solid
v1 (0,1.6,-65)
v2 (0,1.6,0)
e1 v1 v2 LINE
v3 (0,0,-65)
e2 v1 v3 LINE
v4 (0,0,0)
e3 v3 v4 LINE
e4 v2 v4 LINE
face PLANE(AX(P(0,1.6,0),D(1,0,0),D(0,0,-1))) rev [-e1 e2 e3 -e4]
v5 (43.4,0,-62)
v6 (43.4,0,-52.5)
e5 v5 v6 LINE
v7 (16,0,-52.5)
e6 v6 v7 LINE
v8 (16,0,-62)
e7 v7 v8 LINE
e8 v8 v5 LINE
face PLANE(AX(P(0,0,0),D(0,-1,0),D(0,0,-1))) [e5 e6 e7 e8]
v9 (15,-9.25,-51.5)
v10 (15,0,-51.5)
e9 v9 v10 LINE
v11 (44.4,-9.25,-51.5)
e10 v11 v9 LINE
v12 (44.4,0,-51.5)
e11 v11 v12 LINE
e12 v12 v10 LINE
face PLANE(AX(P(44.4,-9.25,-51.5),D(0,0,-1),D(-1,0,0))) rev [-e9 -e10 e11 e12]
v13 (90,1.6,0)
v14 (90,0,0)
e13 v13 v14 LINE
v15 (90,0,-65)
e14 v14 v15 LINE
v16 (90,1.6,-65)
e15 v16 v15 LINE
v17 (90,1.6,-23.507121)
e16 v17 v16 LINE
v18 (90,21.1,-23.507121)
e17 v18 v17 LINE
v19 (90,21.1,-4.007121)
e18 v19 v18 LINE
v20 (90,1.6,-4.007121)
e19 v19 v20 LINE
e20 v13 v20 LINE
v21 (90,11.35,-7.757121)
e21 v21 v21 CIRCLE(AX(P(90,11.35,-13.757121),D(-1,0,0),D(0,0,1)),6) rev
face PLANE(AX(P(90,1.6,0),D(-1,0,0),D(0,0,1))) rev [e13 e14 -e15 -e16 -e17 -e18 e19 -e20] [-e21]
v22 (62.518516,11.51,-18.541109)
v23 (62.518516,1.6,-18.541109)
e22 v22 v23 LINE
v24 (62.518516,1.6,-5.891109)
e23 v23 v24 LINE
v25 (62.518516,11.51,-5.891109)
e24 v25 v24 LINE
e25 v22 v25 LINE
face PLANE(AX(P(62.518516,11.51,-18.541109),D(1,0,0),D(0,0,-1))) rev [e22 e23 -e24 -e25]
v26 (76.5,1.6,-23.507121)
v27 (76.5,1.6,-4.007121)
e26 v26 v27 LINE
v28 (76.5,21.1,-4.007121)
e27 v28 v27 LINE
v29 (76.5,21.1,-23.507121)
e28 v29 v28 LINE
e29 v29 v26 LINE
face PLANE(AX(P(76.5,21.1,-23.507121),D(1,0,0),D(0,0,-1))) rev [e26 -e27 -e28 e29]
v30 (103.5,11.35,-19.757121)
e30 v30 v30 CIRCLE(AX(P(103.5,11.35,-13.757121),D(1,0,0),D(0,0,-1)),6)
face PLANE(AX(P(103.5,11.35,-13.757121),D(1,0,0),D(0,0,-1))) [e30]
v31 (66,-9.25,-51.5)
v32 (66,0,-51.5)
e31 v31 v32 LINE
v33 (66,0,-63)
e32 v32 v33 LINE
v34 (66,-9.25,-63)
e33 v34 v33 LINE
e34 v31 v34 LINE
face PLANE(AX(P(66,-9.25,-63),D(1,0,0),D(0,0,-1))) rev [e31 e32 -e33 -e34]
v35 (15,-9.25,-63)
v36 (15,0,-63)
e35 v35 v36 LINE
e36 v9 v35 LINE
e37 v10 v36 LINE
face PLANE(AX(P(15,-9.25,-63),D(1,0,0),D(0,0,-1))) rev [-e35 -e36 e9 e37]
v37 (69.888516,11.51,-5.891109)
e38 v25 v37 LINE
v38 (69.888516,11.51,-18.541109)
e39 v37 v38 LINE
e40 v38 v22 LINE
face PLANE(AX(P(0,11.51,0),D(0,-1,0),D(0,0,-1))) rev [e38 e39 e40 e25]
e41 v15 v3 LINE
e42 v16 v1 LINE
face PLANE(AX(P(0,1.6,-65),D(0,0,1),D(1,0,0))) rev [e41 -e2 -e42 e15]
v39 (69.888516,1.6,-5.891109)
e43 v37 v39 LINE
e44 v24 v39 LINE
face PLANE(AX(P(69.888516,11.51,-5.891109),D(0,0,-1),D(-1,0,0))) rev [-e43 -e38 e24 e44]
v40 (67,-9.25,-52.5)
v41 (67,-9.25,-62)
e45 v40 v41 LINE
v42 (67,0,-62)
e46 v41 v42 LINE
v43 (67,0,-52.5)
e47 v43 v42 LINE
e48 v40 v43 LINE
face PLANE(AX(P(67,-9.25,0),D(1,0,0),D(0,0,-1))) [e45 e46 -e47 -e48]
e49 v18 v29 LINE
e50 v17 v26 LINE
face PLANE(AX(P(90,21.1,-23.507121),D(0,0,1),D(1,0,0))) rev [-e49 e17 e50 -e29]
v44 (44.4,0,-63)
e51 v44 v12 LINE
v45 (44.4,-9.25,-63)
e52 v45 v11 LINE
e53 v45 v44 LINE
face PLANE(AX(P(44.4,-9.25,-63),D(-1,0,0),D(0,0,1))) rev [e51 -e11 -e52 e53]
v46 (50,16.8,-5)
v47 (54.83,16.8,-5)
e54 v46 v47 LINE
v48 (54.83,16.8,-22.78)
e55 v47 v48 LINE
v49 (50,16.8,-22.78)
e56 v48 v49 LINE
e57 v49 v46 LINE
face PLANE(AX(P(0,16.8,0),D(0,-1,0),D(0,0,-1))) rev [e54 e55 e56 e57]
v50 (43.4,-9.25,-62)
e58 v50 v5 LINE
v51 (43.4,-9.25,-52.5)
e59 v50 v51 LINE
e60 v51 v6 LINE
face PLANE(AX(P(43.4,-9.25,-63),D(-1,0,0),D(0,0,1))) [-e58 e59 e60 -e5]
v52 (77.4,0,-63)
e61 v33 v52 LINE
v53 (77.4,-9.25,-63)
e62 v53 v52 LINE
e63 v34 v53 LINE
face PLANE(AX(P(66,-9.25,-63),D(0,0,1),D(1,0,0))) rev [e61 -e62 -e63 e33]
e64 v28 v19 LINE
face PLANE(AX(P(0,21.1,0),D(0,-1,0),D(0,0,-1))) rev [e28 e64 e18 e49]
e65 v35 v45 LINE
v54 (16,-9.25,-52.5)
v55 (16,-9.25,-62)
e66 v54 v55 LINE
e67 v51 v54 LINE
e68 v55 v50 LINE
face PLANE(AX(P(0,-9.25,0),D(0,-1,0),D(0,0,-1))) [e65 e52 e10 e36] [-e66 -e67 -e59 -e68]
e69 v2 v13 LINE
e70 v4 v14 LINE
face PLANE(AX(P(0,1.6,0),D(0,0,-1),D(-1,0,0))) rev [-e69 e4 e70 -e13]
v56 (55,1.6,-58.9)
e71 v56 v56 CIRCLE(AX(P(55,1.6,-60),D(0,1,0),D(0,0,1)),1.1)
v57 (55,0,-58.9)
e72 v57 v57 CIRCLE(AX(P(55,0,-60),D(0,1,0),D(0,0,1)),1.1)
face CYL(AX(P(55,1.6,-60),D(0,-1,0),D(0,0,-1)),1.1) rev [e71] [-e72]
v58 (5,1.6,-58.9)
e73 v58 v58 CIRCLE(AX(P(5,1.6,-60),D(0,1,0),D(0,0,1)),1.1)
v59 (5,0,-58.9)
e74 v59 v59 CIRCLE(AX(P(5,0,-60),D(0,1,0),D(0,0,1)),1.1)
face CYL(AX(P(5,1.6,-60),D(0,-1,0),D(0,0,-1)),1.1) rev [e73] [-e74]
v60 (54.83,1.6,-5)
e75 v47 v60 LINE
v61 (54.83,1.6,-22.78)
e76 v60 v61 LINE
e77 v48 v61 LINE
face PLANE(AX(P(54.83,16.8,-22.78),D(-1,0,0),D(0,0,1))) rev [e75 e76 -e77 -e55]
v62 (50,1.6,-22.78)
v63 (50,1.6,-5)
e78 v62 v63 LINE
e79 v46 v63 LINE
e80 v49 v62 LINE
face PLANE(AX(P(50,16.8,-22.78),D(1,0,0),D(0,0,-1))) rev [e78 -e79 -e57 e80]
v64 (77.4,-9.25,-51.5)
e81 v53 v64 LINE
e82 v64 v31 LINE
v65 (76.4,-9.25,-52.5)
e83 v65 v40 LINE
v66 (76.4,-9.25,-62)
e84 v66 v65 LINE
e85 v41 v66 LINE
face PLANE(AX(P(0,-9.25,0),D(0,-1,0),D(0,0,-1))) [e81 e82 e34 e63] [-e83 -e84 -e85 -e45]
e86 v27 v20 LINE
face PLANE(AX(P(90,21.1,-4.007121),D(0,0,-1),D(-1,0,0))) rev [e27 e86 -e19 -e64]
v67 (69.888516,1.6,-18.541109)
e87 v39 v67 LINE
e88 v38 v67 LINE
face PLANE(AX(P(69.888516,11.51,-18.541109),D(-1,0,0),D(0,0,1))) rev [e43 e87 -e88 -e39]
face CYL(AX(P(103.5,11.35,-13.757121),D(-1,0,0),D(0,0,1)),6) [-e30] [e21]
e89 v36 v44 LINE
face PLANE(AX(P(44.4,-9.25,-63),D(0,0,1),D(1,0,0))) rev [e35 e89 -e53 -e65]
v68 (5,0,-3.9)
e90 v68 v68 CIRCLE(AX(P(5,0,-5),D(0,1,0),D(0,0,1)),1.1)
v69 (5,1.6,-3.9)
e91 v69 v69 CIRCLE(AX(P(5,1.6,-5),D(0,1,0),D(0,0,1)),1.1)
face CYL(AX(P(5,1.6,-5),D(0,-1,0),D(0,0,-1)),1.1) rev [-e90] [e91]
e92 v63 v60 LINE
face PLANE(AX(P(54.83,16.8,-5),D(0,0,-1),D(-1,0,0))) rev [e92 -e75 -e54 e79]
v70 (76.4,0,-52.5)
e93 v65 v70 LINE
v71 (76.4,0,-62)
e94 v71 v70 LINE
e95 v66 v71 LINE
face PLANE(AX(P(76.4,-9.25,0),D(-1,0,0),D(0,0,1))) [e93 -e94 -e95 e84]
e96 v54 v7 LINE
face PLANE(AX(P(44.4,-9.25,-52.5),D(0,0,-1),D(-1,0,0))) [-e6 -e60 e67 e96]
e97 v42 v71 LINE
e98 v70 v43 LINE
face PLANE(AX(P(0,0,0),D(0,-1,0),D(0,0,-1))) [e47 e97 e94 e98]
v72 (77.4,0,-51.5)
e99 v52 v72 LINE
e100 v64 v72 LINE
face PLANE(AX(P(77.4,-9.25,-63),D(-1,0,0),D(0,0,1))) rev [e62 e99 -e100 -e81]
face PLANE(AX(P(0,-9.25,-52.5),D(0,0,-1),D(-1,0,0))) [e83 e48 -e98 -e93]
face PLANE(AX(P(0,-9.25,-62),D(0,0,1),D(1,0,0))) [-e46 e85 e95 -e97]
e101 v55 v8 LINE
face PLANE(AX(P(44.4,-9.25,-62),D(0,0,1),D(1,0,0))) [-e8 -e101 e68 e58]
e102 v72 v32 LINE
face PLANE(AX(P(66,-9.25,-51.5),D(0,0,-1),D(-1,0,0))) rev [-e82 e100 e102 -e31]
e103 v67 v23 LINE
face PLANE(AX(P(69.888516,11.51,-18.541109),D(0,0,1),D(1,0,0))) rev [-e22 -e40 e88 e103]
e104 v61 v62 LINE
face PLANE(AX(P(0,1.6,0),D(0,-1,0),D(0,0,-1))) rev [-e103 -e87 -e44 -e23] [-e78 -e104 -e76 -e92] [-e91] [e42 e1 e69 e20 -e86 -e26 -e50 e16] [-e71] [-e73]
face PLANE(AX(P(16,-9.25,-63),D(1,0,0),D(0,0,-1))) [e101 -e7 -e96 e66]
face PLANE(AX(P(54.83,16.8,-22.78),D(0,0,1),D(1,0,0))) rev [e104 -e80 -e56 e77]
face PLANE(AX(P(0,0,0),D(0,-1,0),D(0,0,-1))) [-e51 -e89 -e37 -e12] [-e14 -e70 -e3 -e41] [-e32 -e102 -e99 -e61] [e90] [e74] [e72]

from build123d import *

# Parameters (mm, degrees)
SKETCH1_W                            = 90
SKETCH1_H                            = 65
SKETCH1_R                            = 1.1
BOSS_EXTRUDE1_DEPTH                  = 1.6
SKETCH2_W                            = 29.4
SKETCH2_H                            = 11.5
SKETCH2_W_2                          = 27.4
SKETCH2_H_2                          = 9.5
SKETCH2_W_3                          = 11.4
SKETCH2_W_4                          = 9.4
CELL_AND_THERMISTOR_CONNECTORS_DEPTH = 9.25
SKETCH3_W                            = 13.5
SKETCH3_H                            = 19.5
BOSS_EXTRUDE2_DEPTH                  = 19.5
SKETCH4_R                            = 6
BOSS_EXTRUDE3_DEPTH                  = 13.5
SKETCH5_W                            = 4.83
SKETCH5_H                            = 17.78
JTAG_HEADER_DEPTH                    = 15.2
SKETCH6_W                            = 7.37
SKETCH6_H                            = 12.65
AUX_CAN_HEADER_DEPTH                 = 9.91


with BuildPart() as part:
    # Sketch1 → Boss-Extrude1 (new body)
    with BuildSketch(Plane(origin=(0, 0, 0), x_dir=(1, 0, 0), z_dir=(0, 1, 0))):
        with Locations((45, 32.5)):
            Rectangle(SKETCH1_W, SKETCH1_H)
        with Locations((5, 5)):
            Circle(SKETCH1_R, mode=Mode.SUBTRACT)
        with Locations((5, 60)):
            Circle(SKETCH1_R, mode=Mode.SUBTRACT)
        with Locations((55, 60)):
            Circle(SKETCH1_R, mode=Mode.SUBTRACT)
    extrude(amount=BOSS_EXTRUDE1_DEPTH)

    # Sketch2 → Cell and thermistor connectors (add)
    # profile 1 of 2: a face of its own
    with BuildSketch(Plane.XZ):
        with Locations((29.7, -57.25)):
            Rectangle(SKETCH2_W, SKETCH2_H)
        with Locations((29.7, -57.25)):
            Rectangle(SKETCH2_W_2, SKETCH2_H_2, mode=Mode.SUBTRACT)
    # profile 2 of 2: a face of its own
    with BuildSketch(Plane.XZ):
        with Locations((71.7, -57.25)):
            Rectangle(SKETCH2_W_3, SKETCH2_H)
        with Locations((71.7, -57.25)):
            Rectangle(SKETCH2_W_4, SKETCH2_H_2, mode=Mode.SUBTRACT)
    extrude(amount=CELL_AND_THERMISTOR_CONNECTORS_DEPTH)

    # Sketch3 → Boss-Extrude2 (add)
    with BuildSketch(Plane(origin=(0, 1.6, 0), x_dir=(1, 0, 0), z_dir=(0, 1, 0))):
        with Locations((83.25, 13.757121209)):
            Rectangle(SKETCH3_W, SKETCH3_H)
    extrude(amount=BOSS_EXTRUDE2_DEPTH)

    # Sketch4 → Boss-Extrude3 (add)
    with BuildSketch(Plane(origin=(90, 0, 0), x_dir=(0, 0, -1), z_dir=(1, 0, 0))):
        with Locations((13.757121209, 11.35)):
            Circle(SKETCH4_R)
    extrude(amount=BOSS_EXTRUDE3_DEPTH)

    # Sketch5 → JTAG header (add)
    with BuildSketch(Plane(origin=(0, 1.6, 0), x_dir=(1, 0, 0), z_dir=(0, 1, 0))):
        with Locations((52.415, 13.89)):
            Rectangle(SKETCH5_W, SKETCH5_H)
    extrude(amount=JTAG_HEADER_DEPTH)

    # Sketch6 → Aux. CAN header (add)
    with BuildSketch(Plane(origin=(0, 1.6, 0), x_dir=(1, 0, 0), z_dir=(0, 1, 0))):
        with Locations((66.203516114, 12.216109448)):
            Rectangle(SKETCH6_W, SKETCH6_H)
    extrude(amount=AUX_CAN_HEADER_DEPTH)


solid = part.part
